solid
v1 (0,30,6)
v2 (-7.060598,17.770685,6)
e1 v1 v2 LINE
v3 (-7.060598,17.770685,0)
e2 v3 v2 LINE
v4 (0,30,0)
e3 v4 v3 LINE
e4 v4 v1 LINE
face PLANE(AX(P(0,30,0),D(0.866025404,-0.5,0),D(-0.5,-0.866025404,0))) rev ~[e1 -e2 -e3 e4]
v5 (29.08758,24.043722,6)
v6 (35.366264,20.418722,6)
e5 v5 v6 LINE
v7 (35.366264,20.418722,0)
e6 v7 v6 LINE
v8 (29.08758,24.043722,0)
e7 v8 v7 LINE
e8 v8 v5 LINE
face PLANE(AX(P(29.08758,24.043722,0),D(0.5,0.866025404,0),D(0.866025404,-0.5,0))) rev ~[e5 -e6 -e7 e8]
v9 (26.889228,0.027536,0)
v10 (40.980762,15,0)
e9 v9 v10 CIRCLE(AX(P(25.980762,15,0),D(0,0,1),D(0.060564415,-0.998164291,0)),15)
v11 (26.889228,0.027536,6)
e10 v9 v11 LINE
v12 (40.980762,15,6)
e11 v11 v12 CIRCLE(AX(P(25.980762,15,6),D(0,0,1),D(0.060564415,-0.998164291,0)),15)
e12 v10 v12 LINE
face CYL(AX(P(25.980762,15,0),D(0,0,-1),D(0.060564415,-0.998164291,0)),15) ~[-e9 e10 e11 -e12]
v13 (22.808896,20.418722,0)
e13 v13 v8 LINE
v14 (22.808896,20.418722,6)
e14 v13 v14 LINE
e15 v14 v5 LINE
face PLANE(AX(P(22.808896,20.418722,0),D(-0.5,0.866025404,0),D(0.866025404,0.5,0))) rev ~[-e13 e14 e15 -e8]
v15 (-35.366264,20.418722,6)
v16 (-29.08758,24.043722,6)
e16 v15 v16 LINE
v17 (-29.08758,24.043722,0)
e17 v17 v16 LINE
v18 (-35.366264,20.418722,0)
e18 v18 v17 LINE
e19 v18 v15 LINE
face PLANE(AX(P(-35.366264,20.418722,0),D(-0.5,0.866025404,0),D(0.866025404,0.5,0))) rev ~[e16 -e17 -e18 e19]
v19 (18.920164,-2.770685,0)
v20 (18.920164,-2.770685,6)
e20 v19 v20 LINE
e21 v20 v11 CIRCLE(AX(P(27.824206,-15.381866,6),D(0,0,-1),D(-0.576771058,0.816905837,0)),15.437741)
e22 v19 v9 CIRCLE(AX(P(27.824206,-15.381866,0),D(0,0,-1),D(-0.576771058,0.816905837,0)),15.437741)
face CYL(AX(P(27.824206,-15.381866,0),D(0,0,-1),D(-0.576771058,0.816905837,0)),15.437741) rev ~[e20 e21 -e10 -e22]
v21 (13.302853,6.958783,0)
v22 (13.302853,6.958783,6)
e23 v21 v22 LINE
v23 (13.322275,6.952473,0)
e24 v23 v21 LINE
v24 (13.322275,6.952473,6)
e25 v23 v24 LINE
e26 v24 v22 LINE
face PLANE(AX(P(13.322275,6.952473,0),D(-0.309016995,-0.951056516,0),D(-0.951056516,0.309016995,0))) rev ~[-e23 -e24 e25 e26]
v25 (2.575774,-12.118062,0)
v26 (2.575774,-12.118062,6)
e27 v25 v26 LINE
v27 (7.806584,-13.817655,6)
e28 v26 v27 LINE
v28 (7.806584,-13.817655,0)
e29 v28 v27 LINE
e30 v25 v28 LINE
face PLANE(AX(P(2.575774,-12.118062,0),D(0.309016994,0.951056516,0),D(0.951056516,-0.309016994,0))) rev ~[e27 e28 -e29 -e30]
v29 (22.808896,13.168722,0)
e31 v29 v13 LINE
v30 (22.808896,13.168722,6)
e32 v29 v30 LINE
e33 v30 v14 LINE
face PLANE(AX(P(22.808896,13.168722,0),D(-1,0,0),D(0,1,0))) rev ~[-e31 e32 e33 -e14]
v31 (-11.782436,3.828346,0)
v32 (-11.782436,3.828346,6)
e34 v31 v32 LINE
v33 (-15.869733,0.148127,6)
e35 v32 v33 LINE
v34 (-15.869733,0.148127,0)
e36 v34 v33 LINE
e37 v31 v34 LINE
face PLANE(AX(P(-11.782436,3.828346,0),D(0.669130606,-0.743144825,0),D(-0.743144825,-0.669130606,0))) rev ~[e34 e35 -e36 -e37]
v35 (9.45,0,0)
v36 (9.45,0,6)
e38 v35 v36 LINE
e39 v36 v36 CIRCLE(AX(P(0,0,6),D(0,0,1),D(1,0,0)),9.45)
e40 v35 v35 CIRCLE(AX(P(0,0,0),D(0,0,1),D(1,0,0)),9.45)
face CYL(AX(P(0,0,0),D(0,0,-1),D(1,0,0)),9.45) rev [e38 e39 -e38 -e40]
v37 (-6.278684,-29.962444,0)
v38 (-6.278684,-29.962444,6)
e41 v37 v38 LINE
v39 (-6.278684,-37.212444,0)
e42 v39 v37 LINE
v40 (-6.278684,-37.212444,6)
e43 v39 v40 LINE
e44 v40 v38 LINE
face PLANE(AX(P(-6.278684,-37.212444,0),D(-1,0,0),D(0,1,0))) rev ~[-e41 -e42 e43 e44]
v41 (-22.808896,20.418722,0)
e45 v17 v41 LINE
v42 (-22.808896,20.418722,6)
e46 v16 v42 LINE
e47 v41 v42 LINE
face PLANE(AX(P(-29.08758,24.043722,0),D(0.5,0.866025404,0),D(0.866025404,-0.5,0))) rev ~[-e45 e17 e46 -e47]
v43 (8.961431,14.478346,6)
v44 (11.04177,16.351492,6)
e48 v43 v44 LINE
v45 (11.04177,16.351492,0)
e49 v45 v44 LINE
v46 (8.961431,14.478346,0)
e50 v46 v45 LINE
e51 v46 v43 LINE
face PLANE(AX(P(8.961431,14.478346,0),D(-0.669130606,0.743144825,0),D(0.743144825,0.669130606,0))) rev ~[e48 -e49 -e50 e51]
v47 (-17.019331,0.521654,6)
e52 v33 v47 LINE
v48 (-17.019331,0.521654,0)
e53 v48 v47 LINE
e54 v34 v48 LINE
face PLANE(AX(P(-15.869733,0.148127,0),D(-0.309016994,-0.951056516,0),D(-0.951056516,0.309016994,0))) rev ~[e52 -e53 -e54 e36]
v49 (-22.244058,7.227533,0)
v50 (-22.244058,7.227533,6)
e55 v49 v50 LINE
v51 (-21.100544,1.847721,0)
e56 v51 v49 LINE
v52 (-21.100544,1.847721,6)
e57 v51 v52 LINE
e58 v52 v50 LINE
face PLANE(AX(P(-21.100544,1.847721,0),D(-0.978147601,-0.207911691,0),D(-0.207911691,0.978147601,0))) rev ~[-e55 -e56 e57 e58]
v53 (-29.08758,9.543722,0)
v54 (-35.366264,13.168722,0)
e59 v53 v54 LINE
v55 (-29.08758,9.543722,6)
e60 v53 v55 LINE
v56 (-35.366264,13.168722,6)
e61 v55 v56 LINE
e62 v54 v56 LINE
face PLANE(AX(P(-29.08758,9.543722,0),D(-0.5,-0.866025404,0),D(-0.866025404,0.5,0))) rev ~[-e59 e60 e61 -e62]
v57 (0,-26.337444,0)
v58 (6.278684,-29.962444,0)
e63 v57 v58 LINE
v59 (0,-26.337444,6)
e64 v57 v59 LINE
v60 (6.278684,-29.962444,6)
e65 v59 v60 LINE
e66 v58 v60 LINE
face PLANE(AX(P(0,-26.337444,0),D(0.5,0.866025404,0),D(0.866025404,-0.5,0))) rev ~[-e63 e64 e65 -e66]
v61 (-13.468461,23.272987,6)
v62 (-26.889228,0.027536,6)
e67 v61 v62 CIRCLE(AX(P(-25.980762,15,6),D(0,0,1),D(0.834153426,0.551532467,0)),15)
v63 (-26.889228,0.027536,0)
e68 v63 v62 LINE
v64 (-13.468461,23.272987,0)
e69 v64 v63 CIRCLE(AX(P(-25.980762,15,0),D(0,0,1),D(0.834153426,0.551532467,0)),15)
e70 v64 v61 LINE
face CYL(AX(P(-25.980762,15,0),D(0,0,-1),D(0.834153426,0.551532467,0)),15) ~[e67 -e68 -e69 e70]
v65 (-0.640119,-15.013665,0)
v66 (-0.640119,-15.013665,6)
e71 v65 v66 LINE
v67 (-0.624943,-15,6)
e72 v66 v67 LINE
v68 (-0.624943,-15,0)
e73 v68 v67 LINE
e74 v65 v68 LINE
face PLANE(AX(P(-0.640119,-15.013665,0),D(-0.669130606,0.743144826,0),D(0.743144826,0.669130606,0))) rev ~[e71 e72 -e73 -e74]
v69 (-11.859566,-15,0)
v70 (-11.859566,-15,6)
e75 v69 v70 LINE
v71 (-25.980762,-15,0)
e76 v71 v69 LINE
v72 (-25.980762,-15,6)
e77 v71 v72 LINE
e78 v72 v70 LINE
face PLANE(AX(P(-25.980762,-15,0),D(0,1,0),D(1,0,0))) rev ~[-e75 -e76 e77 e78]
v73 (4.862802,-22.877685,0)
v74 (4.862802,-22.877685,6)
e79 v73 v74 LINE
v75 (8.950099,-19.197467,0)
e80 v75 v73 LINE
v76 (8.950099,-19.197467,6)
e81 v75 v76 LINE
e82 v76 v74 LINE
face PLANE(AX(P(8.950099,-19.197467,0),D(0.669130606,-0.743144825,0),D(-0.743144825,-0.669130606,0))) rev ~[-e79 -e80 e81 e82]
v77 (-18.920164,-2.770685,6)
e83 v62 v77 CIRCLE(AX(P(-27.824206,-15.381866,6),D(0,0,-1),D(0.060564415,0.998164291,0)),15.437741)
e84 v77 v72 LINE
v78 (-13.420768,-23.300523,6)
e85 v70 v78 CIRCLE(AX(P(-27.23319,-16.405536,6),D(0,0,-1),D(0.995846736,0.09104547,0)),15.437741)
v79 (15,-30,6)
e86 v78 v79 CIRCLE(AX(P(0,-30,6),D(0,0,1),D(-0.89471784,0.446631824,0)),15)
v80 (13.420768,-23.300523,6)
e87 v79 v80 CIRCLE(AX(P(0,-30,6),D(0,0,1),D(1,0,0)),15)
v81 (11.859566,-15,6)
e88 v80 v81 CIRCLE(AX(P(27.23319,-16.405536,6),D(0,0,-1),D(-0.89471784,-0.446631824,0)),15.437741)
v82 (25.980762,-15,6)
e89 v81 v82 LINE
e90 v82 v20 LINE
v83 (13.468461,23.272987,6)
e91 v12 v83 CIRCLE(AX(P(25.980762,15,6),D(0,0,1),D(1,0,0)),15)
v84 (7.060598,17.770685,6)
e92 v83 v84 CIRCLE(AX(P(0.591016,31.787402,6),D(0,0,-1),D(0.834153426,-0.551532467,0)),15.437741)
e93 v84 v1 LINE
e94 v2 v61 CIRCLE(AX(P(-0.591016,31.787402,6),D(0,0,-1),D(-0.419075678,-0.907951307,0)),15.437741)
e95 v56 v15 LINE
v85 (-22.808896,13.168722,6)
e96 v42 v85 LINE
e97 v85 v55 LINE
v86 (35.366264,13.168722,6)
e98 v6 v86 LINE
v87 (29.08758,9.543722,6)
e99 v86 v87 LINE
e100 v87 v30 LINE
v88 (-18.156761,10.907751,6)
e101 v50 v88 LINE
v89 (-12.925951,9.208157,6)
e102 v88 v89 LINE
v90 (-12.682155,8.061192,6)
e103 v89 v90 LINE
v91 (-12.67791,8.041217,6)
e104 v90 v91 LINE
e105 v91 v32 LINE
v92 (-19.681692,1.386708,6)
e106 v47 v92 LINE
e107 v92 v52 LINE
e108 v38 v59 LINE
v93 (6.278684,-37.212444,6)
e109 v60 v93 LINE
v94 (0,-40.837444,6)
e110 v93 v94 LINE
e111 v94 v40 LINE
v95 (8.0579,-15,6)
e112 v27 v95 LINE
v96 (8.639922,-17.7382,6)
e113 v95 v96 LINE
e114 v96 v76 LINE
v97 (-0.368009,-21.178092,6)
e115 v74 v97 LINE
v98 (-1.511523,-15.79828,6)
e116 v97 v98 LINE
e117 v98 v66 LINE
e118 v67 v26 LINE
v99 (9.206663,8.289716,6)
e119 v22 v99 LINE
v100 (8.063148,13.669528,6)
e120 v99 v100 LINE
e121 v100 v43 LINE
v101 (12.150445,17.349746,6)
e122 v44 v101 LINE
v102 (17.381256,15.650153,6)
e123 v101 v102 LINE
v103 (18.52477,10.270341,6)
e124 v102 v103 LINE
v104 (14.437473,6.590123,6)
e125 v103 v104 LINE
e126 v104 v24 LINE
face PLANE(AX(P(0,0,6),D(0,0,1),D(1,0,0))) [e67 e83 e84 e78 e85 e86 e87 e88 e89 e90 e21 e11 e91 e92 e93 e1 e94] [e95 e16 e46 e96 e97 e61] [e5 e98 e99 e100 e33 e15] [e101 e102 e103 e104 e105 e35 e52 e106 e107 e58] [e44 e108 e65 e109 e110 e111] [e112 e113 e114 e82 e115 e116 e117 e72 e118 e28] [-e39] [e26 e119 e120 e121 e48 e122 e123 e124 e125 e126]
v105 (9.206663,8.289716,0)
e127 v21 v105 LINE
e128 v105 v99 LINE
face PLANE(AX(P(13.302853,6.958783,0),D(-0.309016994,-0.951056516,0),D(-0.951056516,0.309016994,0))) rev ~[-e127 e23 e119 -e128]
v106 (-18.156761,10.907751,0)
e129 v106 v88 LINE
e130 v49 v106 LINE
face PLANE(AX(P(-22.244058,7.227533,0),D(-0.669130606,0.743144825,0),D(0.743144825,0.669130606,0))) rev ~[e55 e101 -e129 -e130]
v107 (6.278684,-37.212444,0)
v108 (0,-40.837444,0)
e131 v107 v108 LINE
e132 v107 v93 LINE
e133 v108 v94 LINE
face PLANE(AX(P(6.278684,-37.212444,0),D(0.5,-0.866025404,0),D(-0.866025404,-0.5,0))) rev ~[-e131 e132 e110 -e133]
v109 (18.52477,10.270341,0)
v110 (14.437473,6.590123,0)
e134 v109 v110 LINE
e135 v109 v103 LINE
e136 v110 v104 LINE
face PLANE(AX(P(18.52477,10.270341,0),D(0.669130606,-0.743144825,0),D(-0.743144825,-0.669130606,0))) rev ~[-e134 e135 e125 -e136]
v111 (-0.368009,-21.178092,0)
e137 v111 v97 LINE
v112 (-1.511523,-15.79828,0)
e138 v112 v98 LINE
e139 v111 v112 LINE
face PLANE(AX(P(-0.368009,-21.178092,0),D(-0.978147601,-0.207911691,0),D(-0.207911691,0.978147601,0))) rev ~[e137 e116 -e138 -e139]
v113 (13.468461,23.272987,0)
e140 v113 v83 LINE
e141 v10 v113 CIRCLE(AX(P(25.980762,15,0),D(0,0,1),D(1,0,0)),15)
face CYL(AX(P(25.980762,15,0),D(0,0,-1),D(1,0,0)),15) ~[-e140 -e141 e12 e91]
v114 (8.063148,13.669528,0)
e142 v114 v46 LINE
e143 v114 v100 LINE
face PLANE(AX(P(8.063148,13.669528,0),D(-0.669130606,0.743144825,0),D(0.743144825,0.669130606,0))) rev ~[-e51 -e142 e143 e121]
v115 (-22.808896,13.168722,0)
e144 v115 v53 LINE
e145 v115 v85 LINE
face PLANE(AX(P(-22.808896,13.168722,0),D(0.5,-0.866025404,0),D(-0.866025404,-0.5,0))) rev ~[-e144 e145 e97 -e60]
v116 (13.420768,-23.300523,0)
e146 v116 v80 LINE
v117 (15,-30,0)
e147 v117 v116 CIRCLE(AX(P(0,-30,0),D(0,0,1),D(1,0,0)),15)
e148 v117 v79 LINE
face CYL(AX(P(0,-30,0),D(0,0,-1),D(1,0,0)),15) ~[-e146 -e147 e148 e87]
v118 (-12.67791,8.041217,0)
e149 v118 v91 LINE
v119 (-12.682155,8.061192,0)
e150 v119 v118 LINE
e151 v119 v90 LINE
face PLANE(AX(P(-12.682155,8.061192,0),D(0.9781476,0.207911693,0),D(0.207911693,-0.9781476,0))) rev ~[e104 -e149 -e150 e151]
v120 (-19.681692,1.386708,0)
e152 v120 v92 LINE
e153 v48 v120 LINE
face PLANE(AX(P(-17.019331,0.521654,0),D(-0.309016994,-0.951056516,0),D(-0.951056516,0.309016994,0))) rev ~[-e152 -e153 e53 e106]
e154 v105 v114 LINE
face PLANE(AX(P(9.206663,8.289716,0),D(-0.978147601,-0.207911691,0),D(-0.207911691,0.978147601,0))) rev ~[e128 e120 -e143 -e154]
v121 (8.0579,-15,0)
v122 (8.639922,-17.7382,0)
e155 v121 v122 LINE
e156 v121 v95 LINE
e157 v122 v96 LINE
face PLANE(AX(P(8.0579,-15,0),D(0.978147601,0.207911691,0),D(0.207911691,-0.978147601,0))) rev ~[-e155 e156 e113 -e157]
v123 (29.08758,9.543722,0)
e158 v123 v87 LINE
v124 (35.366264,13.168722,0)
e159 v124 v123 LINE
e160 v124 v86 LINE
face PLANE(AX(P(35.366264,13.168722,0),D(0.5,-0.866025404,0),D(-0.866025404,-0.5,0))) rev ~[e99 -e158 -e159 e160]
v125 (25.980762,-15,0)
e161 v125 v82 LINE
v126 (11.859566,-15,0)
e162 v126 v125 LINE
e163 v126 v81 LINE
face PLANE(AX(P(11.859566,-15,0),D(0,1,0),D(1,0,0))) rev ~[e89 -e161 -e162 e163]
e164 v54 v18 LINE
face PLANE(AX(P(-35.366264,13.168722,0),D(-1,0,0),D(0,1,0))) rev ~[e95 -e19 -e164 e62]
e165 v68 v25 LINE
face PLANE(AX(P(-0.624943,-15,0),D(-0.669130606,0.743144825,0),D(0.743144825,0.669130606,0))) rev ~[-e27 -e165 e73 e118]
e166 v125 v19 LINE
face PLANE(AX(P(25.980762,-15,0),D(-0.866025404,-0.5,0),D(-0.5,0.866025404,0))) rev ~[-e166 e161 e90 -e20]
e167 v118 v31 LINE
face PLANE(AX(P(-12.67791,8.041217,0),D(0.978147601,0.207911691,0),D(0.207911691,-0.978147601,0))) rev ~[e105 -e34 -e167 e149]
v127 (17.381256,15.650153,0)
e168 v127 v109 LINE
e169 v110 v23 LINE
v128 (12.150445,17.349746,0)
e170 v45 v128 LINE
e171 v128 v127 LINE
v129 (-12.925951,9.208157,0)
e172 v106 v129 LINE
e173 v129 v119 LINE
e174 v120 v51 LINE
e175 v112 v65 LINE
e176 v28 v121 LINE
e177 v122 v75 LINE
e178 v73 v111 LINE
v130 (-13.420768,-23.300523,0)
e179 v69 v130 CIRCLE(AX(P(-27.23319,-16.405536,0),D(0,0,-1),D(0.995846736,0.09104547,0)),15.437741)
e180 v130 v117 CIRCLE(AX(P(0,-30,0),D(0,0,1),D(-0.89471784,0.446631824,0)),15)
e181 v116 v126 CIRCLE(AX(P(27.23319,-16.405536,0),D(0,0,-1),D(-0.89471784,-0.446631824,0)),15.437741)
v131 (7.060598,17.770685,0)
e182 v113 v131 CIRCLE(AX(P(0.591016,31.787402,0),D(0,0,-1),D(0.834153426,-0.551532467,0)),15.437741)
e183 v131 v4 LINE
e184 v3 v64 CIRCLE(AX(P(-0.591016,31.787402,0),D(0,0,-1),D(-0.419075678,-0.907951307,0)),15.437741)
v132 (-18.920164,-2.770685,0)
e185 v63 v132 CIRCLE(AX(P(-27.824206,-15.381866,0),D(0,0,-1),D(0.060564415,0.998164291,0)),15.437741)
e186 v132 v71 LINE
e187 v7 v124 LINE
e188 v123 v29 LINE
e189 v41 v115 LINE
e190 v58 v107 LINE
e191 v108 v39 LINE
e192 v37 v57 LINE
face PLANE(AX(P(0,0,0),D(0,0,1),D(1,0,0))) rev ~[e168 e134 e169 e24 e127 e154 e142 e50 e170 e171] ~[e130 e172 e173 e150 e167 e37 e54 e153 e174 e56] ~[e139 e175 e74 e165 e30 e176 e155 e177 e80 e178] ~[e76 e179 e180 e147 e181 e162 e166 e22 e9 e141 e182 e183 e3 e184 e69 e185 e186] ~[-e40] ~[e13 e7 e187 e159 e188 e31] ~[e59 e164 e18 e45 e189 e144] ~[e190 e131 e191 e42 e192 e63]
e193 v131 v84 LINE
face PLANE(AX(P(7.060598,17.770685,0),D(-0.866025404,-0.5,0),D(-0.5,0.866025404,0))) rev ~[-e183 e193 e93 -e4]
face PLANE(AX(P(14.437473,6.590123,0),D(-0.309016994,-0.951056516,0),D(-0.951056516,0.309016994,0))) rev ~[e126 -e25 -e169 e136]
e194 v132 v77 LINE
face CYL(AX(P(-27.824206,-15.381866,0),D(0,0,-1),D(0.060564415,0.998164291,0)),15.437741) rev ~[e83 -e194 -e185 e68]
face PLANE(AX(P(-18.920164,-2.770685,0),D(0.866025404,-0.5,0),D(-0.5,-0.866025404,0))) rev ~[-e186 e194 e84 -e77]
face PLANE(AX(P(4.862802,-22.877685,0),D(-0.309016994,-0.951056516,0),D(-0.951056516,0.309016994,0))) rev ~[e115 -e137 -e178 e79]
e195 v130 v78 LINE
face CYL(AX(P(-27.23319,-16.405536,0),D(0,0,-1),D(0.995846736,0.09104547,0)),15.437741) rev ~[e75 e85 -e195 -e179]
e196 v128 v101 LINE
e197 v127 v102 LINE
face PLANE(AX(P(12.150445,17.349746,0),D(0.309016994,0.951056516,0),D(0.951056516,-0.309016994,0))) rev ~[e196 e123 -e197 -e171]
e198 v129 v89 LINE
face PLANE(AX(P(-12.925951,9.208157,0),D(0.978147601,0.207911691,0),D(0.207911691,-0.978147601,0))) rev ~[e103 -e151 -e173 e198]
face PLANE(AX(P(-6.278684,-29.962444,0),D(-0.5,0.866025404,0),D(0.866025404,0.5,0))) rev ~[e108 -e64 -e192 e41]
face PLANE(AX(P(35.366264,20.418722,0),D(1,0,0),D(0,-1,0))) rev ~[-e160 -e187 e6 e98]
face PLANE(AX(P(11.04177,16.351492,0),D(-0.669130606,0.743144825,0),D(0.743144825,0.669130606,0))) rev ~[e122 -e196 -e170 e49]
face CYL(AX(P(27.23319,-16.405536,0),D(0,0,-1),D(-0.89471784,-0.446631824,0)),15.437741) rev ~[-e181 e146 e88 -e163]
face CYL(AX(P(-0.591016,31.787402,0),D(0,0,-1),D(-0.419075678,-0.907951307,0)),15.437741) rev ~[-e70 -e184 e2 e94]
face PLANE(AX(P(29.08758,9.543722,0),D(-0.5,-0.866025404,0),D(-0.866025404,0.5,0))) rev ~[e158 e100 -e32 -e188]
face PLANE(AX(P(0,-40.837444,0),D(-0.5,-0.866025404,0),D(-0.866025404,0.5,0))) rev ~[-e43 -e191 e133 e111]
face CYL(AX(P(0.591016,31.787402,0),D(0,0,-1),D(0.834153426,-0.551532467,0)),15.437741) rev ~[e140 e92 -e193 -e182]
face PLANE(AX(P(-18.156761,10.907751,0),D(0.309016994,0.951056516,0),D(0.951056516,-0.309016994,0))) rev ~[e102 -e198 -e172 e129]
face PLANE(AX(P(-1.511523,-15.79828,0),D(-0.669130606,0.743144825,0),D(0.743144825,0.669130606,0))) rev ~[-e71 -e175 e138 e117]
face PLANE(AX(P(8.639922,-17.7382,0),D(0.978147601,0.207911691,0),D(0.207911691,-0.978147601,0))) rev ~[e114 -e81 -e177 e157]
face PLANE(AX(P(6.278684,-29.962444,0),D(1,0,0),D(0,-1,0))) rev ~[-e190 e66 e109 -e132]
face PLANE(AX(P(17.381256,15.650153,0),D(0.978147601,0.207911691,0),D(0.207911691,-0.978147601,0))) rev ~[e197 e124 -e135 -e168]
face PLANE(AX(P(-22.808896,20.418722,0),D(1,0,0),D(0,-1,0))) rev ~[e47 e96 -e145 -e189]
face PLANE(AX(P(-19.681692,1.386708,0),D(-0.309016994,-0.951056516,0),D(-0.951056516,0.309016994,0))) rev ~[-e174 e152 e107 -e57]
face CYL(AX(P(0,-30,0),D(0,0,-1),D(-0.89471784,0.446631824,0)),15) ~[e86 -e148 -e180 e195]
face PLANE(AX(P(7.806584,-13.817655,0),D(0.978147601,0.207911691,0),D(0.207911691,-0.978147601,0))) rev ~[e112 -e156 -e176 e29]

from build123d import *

# Parameters (mm, degrees)
F0_R     = 9.45
F1_DEPTH = 6


with BuildPart() as f1:
    # F0 (on Top) → F1 (new body)
    with BuildSketch(Plane.XY):
        Polygon((11.8595659331, -15), (25.9807621135, -15), (18.9201640233, -2.7706853759), (13.302852552, 6.9587834943), (9.2066626406, 8.2897162761), (8.0631483411, 13.6695280801), (8.9614312964, 14.478345686), (7.0605980902, 17.7706853759), (0, 30), (-7.0605980902, 17.7706853759), (-12.6779095615, 8.0412165057), (-11.7824362055, 3.8283455928), (-15.8697327457, 0.1481272578), (-17.0193308171, 0.521654314), (-18.9201640233, -2.7706853759), (-25.9807621135, -15), (-11.8595659331, -15), (-0.6249429905, -15), (2.5757735649, -12.1180618689), (7.8065844046, -13.8176553379), (8.0578995207, -15), align=None)
        Circle(F0_R, mode=Mode.SUBTRACT)
        with BuildLine():
            ThreePointArc((13.4207676072, -23.3005226447), (12.0614730092, -19.25910479), (11.8595659331, -15))
            Line((11.8595659331, -15), (8.0578995207, -15))
            Line((8.0578995207, -15), (8.6399217922, -17.7381995032))
            ThreePointArc((8.6399217922, -17.7381995032), (11.3755599368, -20.2226467731), (13.4207676072, -23.3005226447))
        make_face()
        with BuildLine():
            Line((13.302852552, 6.9587834943), (18.9201640233, -2.7706853759))
            ThreePointArc((18.9201640233, -2.7706853759), (22.7096105069, -0.815989638), (26.8892283353, 0.0275356362))
            ThreePointArc((26.8892283353, 0.0275356362), (19.1613457519, 1.6397769298), (13.3222745374, 6.9524729087))
            Line((13.3222745374, 6.9524729087), (13.302852552, 6.9587834943))
        make_face()
        with BuildLine():
            ThreePointArc((15, -30), (14.5998546929, -26.5584534078), (13.4207676072, -23.3005226447))
            ThreePointArc((13.4207676072, -23.3005226447), (11.3755599368, -20.2226467731), (8.6399217922, -17.7381995032))
            Line((8.6399217922, -17.7381995032), (8.9500987041, -19.1974671419))
            Line((8.9500987041, -19.1974671419), (4.8628021639, -22.8776854769))
            Line((4.8628021639, -22.8776854769), (-0.3680086757, -21.1780920079))
            Line((-0.3680086757, -21.1780920079), (-1.5115229752, -15.7982802038))
            Line((-1.5115229752, -15.7982802038), (-0.6401191106, -15.0136646399))
            ThreePointArc((-0.6401191106, -15.0136646399), (-8.1605843982, -17.4141006567), (-13.4207676072, -23.3005226447))
            ThreePointArc((-13.4207676072, -23.3005226447), (-3.4415465922, -44.5998546929), (15, -30))
        make_face()
        Polygon((6.2786841774, -37.2124443067), (0, -40.8374443067), (-6.2786841774, -37.2124443067), (-6.2786841774, -29.9624443067), (0, -26.3374443067), (6.2786841774, -29.9624443067), align=None, mode=Mode.SUBTRACT)
        with BuildLine():
            ThreePointArc((13.3222745374, 6.9524729087), (19.1613457519, 1.6397769298), (26.8892283353, 0.0275356362))
            ThreePointArc((26.8892283353, 0.0275356362), (36.903833873, 4.7196058764), (40.9807621135, 15))
            ThreePointArc((40.9807621135, 15), (30.3002226828, 29.3646183517), (13.4684607282, 23.2729870084))
            ThreePointArc((13.4684607282, 23.2729870084), (11.8255458689, 19.9628472741), (11.041770491, 16.3514915103))
            Line((11.041770491, 16.3514915103), (12.1504448812, 17.3497464151))
            Line((12.1504448812, 17.3497464151), (17.3812557208, 15.650152946))
            Line((17.3812557208, 15.650152946), (18.5247700203, 10.270341142))
            Line((18.5247700203, 10.270341142), (14.4374734802, 6.590122807))
            Line((14.4374734802, 6.590122807), (13.3222745374, 6.9524729087))
        make_face()
        Polygon((29.0875800178, 24.0437221533), (35.3662641952, 20.4187221533), (35.3662641952, 13.1687221533), (29.0875800178, 9.5437221533), (22.8088958404, 13.1687221533), (22.8088958404, 20.4187221533), align=None, mode=Mode.SUBTRACT)
        with BuildLine():
            Line((-0.6401191106, -15.0136646399), (-0.6249429905, -15))
            Line((-0.6249429905, -15), (-11.8595659331, -15))
            ThreePointArc((-11.8595659331, -15), (-12.0614730092, -19.25910479), (-13.4207676072, -23.3005226447))
            ThreePointArc((-13.4207676072, -23.3005226447), (-8.1605843982, -17.4141006567), (-0.6401191106, -15.0136646399))
        make_face()
        with BuildLine():
            Line((7.0605980902, 17.7706853759), (8.9614312964, 14.478345686))
            Line((8.9614312964, 14.478345686), (11.041770491, 16.3514915103))
            ThreePointArc((11.041770491, 16.3514915103), (11.8255458689, 19.9628472741), (13.4684607282, 23.2729870084))
            ThreePointArc((13.4684607282, 23.2729870084), (10.6481374977, 20.0750944281), (7.0605980902, 17.7706853759))
        make_face()
        with BuildLine():
            ThreePointArc((-26.8892283353, 0.0275356362), (-22.7096105069, -0.815989638), (-18.9201640233, -2.7706853759))
            Line((-18.9201640233, -2.7706853759), (-17.0193308171, 0.521654314))
            Line((-17.0193308171, 0.521654314), (-19.6816922832, 1.3867079928))
            ThreePointArc((-19.6816922832, 1.3867079928), (-23.2011058057, 0.259799499), (-26.8892283353, 0.0275356362))
        make_face()
        with BuildLine():
            Line((-12.6779095615, 8.0412165057), (-7.0605980902, 17.7706853759))
            ThreePointArc((-7.0605980902, 17.7706853759), (-10.6481374977, 20.0750944281), (-13.4684607282, 23.2729870084))
            ThreePointArc((-13.4684607282, 23.2729870084), (-11.6161437618, 19.3194605693), (-10.9807621135, 15))
            ThreePointArc((-10.9807621135, 15), (-11.4123184715, 11.4278228138), (-12.6821554268, 8.0611917312))
            Line((-12.6821554268, 8.0611917312), (-12.6779095615, 8.0412165057))
        make_face()
        with BuildLine():
            ThreePointArc((-13.4684607282, 23.2729870084), (-38.9711431703, 22.5), (-26.8892283353, 0.0275356362))
            ThreePointArc((-26.8892283353, 0.0275356362), (-23.2011058057, 0.259799499), (-19.6816922832, 1.3867079928))
            Line((-19.6816922832, 1.3867079928), (-21.1005435853, 1.8477207269))
            Line((-21.1005435853, 1.8477207269), (-22.2440578848, 7.2275325309))
            Line((-22.2440578848, 7.2275325309), (-18.1567613447, 10.9077508659))
            Line((-18.1567613447, 10.9077508659), (-12.925950505, 9.2081573968))
            Line((-12.925950505, 9.2081573968), (-12.6821554268, 8.0611917312))
            ThreePointArc((-12.6821554268, 8.0611917312), (-11.4123184715, 11.4278228138), (-10.9807621135, 15))
            ThreePointArc((-10.9807621135, 15), (-11.6161437618, 19.3194605693), (-13.4684607282, 23.2729870084))
        make_face()
        Polygon((-35.3662641952, 13.1687221533), (-35.3662641952, 20.4187221533), (-29.0875800178, 24.0437221533), (-22.8088958404, 20.4187221533), (-22.8088958404, 13.1687221533), (-29.0875800178, 9.5437221533), align=None, mode=Mode.SUBTRACT)
    extrude(amount=F1_DEPTH)


solid = f1.part
